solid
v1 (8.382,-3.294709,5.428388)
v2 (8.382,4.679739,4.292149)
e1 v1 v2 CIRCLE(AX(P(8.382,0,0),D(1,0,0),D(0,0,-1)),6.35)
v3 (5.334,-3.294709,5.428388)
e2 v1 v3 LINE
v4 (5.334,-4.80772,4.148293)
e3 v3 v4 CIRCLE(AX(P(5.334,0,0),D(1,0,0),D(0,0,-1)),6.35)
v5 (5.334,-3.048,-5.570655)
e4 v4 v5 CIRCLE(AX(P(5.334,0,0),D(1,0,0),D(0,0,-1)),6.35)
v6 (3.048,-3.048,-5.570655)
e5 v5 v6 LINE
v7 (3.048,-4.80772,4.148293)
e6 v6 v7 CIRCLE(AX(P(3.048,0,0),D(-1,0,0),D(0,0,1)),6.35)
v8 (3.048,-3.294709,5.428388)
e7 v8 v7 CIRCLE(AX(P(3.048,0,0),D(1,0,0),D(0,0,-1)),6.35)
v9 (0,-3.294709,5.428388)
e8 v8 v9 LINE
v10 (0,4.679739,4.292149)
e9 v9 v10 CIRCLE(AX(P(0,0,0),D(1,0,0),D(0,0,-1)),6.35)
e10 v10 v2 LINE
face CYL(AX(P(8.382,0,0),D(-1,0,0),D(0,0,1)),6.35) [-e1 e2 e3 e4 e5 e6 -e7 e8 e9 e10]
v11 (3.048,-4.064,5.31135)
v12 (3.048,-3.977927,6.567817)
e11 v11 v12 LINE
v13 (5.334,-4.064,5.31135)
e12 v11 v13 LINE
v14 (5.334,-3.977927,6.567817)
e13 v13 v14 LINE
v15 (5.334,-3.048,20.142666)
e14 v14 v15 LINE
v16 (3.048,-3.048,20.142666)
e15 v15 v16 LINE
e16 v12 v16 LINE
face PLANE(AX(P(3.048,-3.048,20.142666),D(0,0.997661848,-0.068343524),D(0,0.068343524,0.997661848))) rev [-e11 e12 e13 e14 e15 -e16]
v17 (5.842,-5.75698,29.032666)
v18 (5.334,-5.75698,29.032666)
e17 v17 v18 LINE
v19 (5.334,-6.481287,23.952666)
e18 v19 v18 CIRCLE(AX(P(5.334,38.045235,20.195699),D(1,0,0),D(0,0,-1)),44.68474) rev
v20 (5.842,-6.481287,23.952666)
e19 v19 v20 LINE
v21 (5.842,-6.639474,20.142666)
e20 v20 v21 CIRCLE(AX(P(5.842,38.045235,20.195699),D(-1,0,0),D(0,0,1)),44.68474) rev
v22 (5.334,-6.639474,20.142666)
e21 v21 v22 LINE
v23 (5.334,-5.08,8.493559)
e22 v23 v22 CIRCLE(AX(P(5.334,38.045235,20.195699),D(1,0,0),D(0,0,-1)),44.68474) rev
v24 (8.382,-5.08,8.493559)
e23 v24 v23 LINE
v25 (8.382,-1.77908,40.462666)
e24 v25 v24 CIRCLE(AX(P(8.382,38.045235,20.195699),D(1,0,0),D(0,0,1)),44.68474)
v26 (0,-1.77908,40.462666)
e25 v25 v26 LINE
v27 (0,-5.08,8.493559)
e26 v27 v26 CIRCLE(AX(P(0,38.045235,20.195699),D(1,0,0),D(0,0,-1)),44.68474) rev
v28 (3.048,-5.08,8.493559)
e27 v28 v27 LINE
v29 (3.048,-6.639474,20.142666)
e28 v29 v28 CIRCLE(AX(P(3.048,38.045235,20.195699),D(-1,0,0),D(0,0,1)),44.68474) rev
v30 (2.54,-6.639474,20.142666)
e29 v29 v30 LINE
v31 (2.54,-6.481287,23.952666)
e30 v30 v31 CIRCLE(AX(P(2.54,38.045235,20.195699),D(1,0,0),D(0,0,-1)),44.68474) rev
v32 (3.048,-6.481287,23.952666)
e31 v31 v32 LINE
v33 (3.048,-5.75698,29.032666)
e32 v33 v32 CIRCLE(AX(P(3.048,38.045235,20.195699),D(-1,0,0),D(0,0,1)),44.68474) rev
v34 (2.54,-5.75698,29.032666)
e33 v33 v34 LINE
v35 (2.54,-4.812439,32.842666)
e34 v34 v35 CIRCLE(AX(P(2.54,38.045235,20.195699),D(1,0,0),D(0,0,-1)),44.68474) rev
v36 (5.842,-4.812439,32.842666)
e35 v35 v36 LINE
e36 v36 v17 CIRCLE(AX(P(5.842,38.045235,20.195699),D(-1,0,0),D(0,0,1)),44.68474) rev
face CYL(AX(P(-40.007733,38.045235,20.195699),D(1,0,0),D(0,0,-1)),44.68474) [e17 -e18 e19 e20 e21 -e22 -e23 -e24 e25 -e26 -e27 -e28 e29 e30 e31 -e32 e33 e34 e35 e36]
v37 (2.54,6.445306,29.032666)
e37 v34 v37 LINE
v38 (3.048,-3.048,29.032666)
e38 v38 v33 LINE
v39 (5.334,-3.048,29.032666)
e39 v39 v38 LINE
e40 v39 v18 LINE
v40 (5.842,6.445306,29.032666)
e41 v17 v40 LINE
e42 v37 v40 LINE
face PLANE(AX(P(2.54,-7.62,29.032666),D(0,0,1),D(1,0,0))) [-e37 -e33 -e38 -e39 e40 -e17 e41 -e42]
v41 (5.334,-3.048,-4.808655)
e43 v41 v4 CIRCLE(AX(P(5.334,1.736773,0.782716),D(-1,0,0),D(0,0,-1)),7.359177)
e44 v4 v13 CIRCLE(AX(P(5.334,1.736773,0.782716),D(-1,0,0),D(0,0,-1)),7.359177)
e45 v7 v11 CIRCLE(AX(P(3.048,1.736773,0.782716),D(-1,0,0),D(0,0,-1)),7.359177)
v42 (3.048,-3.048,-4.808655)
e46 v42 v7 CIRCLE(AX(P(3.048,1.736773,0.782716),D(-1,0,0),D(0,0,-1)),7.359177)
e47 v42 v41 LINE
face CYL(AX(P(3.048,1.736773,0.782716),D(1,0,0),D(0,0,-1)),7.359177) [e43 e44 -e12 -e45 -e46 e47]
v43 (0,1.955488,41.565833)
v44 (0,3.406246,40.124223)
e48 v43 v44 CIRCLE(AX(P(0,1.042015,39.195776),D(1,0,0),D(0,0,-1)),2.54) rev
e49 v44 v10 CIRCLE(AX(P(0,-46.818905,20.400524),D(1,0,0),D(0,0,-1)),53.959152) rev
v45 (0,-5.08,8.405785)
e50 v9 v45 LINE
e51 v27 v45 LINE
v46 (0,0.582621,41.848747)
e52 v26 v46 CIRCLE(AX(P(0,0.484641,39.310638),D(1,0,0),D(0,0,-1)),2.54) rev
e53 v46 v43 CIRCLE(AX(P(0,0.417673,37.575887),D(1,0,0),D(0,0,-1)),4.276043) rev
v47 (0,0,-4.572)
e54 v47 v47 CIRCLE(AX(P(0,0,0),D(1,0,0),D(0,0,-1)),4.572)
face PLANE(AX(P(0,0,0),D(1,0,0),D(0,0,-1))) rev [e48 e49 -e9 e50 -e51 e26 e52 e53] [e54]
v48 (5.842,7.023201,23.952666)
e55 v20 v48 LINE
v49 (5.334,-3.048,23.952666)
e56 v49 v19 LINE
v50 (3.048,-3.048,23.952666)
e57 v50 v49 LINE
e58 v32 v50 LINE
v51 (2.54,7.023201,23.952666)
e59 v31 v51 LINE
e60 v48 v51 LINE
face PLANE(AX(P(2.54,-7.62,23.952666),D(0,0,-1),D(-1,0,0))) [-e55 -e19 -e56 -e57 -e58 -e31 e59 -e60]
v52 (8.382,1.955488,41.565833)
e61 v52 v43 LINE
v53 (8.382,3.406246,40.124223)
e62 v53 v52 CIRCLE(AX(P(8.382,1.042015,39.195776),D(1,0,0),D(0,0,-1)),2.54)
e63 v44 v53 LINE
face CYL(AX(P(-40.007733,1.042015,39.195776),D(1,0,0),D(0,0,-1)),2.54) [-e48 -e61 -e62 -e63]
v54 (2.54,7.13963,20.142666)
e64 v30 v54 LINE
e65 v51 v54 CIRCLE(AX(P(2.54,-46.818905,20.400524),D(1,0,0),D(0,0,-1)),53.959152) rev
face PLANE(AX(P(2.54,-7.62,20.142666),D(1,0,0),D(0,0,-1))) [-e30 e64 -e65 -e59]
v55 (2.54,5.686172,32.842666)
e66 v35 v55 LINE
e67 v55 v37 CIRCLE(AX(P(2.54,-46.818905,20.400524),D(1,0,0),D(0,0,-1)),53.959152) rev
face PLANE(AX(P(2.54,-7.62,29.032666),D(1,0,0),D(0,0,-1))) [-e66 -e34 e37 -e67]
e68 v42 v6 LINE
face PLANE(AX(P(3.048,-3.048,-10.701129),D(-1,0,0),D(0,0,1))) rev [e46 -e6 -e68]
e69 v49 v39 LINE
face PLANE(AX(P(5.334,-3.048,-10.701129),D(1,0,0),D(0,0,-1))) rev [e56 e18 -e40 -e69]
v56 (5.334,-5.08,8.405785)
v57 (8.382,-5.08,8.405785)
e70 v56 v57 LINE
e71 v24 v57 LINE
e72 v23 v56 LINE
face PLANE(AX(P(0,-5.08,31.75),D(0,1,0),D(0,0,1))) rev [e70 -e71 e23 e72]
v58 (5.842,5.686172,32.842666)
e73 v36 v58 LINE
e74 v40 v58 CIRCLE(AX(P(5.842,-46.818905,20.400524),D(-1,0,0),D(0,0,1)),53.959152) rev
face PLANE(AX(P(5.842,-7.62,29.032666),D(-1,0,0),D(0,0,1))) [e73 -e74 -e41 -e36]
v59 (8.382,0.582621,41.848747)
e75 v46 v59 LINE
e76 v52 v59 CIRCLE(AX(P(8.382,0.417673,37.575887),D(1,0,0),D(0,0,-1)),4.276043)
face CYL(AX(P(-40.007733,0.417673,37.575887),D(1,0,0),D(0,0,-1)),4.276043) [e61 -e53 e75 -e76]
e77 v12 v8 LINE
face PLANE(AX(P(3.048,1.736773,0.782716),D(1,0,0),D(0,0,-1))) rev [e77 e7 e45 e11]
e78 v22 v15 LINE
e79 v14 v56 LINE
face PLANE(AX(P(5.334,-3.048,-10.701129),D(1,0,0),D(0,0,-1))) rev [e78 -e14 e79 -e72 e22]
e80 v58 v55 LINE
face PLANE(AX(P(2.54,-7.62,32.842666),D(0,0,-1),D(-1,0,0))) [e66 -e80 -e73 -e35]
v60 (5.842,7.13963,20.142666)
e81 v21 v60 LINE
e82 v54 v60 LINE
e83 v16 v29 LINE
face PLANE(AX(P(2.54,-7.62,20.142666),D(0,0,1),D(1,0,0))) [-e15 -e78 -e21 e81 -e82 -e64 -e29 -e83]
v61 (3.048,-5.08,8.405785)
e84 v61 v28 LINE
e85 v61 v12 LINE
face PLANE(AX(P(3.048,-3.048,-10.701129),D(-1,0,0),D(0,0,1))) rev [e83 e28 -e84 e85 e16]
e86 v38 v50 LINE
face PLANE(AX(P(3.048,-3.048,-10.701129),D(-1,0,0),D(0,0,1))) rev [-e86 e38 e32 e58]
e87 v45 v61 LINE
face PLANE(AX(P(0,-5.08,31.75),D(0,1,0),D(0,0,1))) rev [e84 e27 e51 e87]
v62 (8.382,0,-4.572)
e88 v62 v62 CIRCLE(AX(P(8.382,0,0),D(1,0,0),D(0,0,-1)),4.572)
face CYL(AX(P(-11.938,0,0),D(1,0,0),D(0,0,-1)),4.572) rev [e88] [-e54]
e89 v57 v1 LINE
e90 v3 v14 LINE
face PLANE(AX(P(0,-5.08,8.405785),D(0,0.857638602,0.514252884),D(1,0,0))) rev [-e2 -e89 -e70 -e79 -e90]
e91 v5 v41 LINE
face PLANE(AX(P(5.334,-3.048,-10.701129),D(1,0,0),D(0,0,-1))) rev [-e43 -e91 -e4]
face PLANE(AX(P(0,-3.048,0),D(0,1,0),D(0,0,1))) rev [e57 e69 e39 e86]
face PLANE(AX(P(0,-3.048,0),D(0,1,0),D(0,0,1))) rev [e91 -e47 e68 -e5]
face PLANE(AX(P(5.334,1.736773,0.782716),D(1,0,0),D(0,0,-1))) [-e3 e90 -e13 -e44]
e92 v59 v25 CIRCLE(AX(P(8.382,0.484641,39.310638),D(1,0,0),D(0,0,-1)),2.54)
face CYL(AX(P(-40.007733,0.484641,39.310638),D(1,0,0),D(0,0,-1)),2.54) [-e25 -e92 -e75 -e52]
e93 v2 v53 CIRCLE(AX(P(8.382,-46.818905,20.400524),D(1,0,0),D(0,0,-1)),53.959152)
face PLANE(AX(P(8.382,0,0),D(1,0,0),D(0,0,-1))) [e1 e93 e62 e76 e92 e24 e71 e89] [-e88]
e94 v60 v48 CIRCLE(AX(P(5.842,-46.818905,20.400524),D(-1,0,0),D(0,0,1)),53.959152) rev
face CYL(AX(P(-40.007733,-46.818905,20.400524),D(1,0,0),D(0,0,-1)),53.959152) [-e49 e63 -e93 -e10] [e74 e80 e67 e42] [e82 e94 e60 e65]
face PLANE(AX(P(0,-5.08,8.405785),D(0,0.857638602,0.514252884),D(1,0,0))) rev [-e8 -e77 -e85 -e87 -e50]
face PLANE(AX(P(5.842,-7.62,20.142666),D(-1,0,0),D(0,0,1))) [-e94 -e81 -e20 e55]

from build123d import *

# Parameters (mm, degrees)
SKETCH1_R               = 6.35
BOSS_EXTRUDE1_DEPTH     = 8.382
SKETCH6_W               = 8.382
SKETCH6_H               = 10.16
BOSS_EXTRUDE2_DEPTH     = 31.75
CUT_EXTRUDE4_DEPTH      = 37.592
BOSS_EXTRUDE3_START     = -8.382
BOSS_EXTRUDE3_DEPTH     = 8.382
BOSS_EXTRUDE4_START     = -8.382
SKETCH11_R              = 6.35
BOSS_EXTRUDE4_DEPTH     = 8.382
FILLET1_R               = 2.54
CUT_EXTRUDE5_DEPTH      = 12.192
CUT_EXTRUDE6_DEPTH      = 2.54
CUT_EXTRUDE6_DEPTH_BACK = 45.396714307
SKETCH13_W              = 3.302
SKETCH13_H              = 3.81
CUT_EXTRUDE7_DEPTH      = 5.842
CUT_EXTRUDE7_DEPTH_BACK = 2.032
SKETCH14_W              = 2.286
SKETCH14_H              = 39.733795437
BOSS_EXTRUDE5_DEPTH     = 2.286
SKETCH19_R              = 4.572
CUT_EXTRUDE8_DEPTH      = 20.32
CHAMFER1_SIZE           = 2.54
CHAMFER1_SIZE_2         = 1.929900828


with BuildPart() as part:
    # Sketch1 → Boss-Extrude1 (new body)
    with BuildSketch(Plane(origin=(0, 0, 0), x_dir=(0, 0, -1), z_dir=(1, 0, 0))):
        Circle(SKETCH1_R)
    extrude(amount=BOSS_EXTRUDE1_DEPTH)

    # Sketch6 → Boss-Extrude2 (add)
    with BuildSketch(Plane.XY):
        with Locations((4.191, 0)):
            Rectangle(SKETCH6_W, SKETCH6_H)
    extrude(amount=BOSS_EXTRUDE2_DEPTH)

    # Sketch9 → Cut-Extrude4 (cut)
    with BuildSketch(Plane.ZY):
        with BuildLine():
            Line((31.75, 5.08), (11.408365483, 5.08))
            Line((11.408365483, 5.08), (3.81, 5.08))
            ThreePointArc((3.81, 5.08), (5.339430543, 3.232524289), (6.092803339, 0.955518862))
            Line((6.092803339, 0.955518862), (11.408365483, 0.955518862))
            Line((11.408365483, 0.955518862), (11.408365483, -5.08))
            Line((11.408365483, -5.08), (31.75, -5.08))
            Line((31.75, -5.08), (31.75, 5.08))
        make_face()
    extrude(amount=-CUT_EXTRUDE4_DEPTH, mode=Mode.SUBTRACT)

    # Sketch8 → Boss-Extrude3 (add)
    with BuildSketch(Plane(origin=(8.382, 0, 0), x_dir=(0, 0, -1), z_dir=(1, 0, 0)).offset(BOSS_EXTRUDE3_START)):
        with BuildLine():
            ThreePointArc((-4.292149369, 4.679738646), (-6.310240248, 0.709484333), (-5.22417178, -3.609782433))
            ThreePointArc((-5.22417178, -3.609782433), (-6.393298566, -4.253843839), (-7.59869899, -4.827152092))
            ThreePointArc((-7.59869899, -4.827152092), (-24.920173533, -6.389046133), (-41.525963587, -1.219836328))
            ThreePointArc((-41.525963587, -1.219836328), (-41.809620195, 1.017710808), (-40.915378479, 3.088317002))
            ThreePointArc((-40.915378479, 3.088317002), (-22.743048705, 7.089374731), (-4.292149369, 4.679738646))
        make_face()
    extrude(amount=BOSS_EXTRUDE3_DEPTH)

    # Sketch11 → Boss-Extrude4 (add)
    with BuildSketch(Plane(origin=(8.382, 0, 0), x_dir=(0, 0, -1), z_dir=(1, 0, 0)).offset(BOSS_EXTRUDE4_START)):
        Circle(SKETCH11_R)
    extrude(amount=BOSS_EXTRUDE4_DEPTH)

    # Fillet1
    fillet1_edges = [part.edges().sort_by_distance(p)[0] for p in [
        (4.191, -1.219836328, 41.525963587),
        (4.191, 3.088317002, 40.915378479),
    ]]
    fillet(fillet1_edges, radius=FILLET1_R)

    # Sketch12 → Cut-Extrude5 (cut)
    with BuildSketch(Plane.ZY):
        with BuildLine():
            Line((5.311349681, -3.480239153), (6.475883823, -5.08))
            Line((6.475883823, -5.08), (3.81, -5.08))
            ThreePointArc((3.81, -5.08), (4.630287647, -4.345450069), (5.311349681, -3.480239153))
        make_face()
    extrude(amount=-CUT_EXTRUDE5_DEPTH, mode=Mode.SUBTRACT)

    # Sketch13 → Cut-Extrude6 (cut, two sides: drawn at the far end of the back side and taken through both)
    with BuildSketch(Plane.XZ.offset(5.08).offset(-CUT_EXTRUDE6_DEPTH_BACK)):
        with Locations((4.191, 30.937666225)):
            Rectangle(SKETCH13_W, SKETCH13_H)
        with Locations((4.191, 22.047666225)):
            Rectangle(SKETCH13_W, SKETCH13_H)
    extrude(amount=CUT_EXTRUDE6_DEPTH + CUT_EXTRUDE6_DEPTH_BACK, mode=Mode.SUBTRACT)

    # Sketch14 → Cut-Extrude7 (cut, two sides: drawn at the far end of the back side and taken through both)
    with BuildSketch(Plane.XZ.offset(5.08).offset(-CUT_EXTRUDE7_DEPTH_BACK)):
        with Locations((4.191, 9.165768507)):
            Rectangle(SKETCH14_W, SKETCH14_H)
    extrude(amount=CUT_EXTRUDE7_DEPTH + CUT_EXTRUDE7_DEPTH_BACK, mode=Mode.SUBTRACT)

    # Sketch15 → Boss-Extrude5 (add)
    with BuildSketch(Plane.ZY.offset(-5.334)):
        with BuildLine():
            Line((20.142666225, -3.048), (5.311349681, -4.064))
            ThreePointArc((5.311349681, -4.064), (0.047585795, -5.585594771), (-4.808654899, -3.048))
            Line((-4.808654899, -3.048), (20.142666225, -3.048))
        make_face()
    extrude(amount=BOSS_EXTRUDE5_DEPTH)

    # Sketch19 → Cut-Extrude8 (cut)
    with BuildSketch(Plane(origin=(8.382, 0, 0), x_dir=(0, 0, -1), z_dir=(1, 0, 0))):
        Circle(SKETCH19_R)
    extrude(amount=-CUT_EXTRUDE8_DEPTH, mode=Mode.SUBTRACT)

    # Chamfer1
    # the kernel refuses this chamfer: 2.54, 1.929900828 mm, written as the material it takes off along each edge
    with BuildSketch(Plane(origin=(-6.584556216, -5.08, 6.475883823), x_dir=(0, 0.7995159790431987, -0.6006448195519506), z_dir=(1, 0, 0))) as chamfer1_piece_1_section:
        Polygon((CHAMFER1_SIZE * 0.999886403459, CHAMFER1_SIZE * 0.0150724974299), (-CHAMFER1_SIZE_2 * 0.600644819472, CHAMFER1_SIZE_2 * 0.799515978937), (0, 0), align=None)
    chamfer1_piece_1 = extrude(amount=9.632556216, mode=Mode.PRIVATE)
    chamfer1_piece_1 = chamfer1_piece_1 - Plane(origin=(1.524, 0, 0), x_dir=(0, -0.800000000000003, 0.5999999999999959), z_dir=(-1, 0, 0)) * Cylinder(6.35, 30, mode=Mode.PRIVATE)
    add(chamfer1_piece_1, mode=Mode.SUBTRACT)
    with BuildSketch(Plane(origin=(-6.584556216, -5.08, 6.475883823), x_dir=(0, 0.7995159790431987, -0.6006448195519506), z_dir=(1, 0, 0))) as chamfer1_piece_2_section:
        Polygon((CHAMFER1_SIZE * 0.999886403459, CHAMFER1_SIZE * 0.0150724974299), (-CHAMFER1_SIZE_2 * 0.600644819472, CHAMFER1_SIZE_2 * 0.799515978937), (0, 0), align=None)
    chamfer1_piece_2 = extrude(amount=16.217112431, mode=Mode.PRIVATE)
    chamfer1_piece_2 = chamfer1_piece_2 - Plane(origin=(6.858, 0, 0), x_dir=(0, -0.800000000000003, 0.5999999999999959), z_dir=(-1, 0, 0)) * Cylinder(6.35, 43, mode=Mode.PRIVATE)
    chamfer1_piece_2 = split(chamfer1_piece_2, bisect_by=Plane(origin=(5.334, -3.740270515, 5.829817166), z_dir=(1, 0, 0)), keep=Keep.TOP, mode=Mode.PRIVATE)
    add(chamfer1_piece_2, mode=Mode.SUBTRACT)
    with BuildSketch(Plane(origin=(-1.250556216, -5.08, 6.475883823), x_dir=(0, 0.7995159790431987, -0.6006448195519506), z_dir=(1, 0, 0))) as chamfer1_piece_3_section:
        Polygon((CHAMFER1_SIZE * 0.999886403459, CHAMFER1_SIZE * 0.0150724974299), (-CHAMFER1_SIZE_2 * 0.600644819472, CHAMFER1_SIZE_2 * 0.799515978937), (0, 0), align=None)
    chamfer1_piece_3 = extrude(amount=16.217112431, mode=Mode.PRIVATE)
    chamfer1_piece_3 = chamfer1_piece_3 - Plane(origin=(1.524, 0, 0), x_dir=(0, -0.800000000000003, 0.5999999999999959), z_dir=(-1, 0, 0)) * Cylinder(6.35, 43, mode=Mode.PRIVATE)
    chamfer1_piece_3 = split(chamfer1_piece_3, bisect_by=Plane(origin=(3.048, -3.740270515, 5.829817166), z_dir=(-1, 0, 0)), keep=Keep.TOP, mode=Mode.PRIVATE)
    add(chamfer1_piece_3, mode=Mode.SUBTRACT)
    with BuildSketch(Plane(origin=(5.334, -5.08, 6.475883823), x_dir=(0, 0.7995159790431987, -0.6006448195519506), z_dir=(1, 0, 0))) as chamfer1_piece_4_section:
        Polygon((CHAMFER1_SIZE * 0.999886403459, CHAMFER1_SIZE * 0.0150724974299), (-CHAMFER1_SIZE_2 * 0.600644819472, CHAMFER1_SIZE_2 * 0.799515978937), (0, 0), align=None)
    chamfer1_piece_4 = extrude(amount=9.632556216, mode=Mode.PRIVATE)
    chamfer1_piece_4 = chamfer1_piece_4 - Plane(origin=(6.858, 0, 0), x_dir=(0, -0.800000000000003, 0.5999999999999959), z_dir=(-1, 0, 0)) * Cylinder(6.35, 30, mode=Mode.PRIVATE)
    add(chamfer1_piece_4, mode=Mode.SUBTRACT)


solid = part.part
